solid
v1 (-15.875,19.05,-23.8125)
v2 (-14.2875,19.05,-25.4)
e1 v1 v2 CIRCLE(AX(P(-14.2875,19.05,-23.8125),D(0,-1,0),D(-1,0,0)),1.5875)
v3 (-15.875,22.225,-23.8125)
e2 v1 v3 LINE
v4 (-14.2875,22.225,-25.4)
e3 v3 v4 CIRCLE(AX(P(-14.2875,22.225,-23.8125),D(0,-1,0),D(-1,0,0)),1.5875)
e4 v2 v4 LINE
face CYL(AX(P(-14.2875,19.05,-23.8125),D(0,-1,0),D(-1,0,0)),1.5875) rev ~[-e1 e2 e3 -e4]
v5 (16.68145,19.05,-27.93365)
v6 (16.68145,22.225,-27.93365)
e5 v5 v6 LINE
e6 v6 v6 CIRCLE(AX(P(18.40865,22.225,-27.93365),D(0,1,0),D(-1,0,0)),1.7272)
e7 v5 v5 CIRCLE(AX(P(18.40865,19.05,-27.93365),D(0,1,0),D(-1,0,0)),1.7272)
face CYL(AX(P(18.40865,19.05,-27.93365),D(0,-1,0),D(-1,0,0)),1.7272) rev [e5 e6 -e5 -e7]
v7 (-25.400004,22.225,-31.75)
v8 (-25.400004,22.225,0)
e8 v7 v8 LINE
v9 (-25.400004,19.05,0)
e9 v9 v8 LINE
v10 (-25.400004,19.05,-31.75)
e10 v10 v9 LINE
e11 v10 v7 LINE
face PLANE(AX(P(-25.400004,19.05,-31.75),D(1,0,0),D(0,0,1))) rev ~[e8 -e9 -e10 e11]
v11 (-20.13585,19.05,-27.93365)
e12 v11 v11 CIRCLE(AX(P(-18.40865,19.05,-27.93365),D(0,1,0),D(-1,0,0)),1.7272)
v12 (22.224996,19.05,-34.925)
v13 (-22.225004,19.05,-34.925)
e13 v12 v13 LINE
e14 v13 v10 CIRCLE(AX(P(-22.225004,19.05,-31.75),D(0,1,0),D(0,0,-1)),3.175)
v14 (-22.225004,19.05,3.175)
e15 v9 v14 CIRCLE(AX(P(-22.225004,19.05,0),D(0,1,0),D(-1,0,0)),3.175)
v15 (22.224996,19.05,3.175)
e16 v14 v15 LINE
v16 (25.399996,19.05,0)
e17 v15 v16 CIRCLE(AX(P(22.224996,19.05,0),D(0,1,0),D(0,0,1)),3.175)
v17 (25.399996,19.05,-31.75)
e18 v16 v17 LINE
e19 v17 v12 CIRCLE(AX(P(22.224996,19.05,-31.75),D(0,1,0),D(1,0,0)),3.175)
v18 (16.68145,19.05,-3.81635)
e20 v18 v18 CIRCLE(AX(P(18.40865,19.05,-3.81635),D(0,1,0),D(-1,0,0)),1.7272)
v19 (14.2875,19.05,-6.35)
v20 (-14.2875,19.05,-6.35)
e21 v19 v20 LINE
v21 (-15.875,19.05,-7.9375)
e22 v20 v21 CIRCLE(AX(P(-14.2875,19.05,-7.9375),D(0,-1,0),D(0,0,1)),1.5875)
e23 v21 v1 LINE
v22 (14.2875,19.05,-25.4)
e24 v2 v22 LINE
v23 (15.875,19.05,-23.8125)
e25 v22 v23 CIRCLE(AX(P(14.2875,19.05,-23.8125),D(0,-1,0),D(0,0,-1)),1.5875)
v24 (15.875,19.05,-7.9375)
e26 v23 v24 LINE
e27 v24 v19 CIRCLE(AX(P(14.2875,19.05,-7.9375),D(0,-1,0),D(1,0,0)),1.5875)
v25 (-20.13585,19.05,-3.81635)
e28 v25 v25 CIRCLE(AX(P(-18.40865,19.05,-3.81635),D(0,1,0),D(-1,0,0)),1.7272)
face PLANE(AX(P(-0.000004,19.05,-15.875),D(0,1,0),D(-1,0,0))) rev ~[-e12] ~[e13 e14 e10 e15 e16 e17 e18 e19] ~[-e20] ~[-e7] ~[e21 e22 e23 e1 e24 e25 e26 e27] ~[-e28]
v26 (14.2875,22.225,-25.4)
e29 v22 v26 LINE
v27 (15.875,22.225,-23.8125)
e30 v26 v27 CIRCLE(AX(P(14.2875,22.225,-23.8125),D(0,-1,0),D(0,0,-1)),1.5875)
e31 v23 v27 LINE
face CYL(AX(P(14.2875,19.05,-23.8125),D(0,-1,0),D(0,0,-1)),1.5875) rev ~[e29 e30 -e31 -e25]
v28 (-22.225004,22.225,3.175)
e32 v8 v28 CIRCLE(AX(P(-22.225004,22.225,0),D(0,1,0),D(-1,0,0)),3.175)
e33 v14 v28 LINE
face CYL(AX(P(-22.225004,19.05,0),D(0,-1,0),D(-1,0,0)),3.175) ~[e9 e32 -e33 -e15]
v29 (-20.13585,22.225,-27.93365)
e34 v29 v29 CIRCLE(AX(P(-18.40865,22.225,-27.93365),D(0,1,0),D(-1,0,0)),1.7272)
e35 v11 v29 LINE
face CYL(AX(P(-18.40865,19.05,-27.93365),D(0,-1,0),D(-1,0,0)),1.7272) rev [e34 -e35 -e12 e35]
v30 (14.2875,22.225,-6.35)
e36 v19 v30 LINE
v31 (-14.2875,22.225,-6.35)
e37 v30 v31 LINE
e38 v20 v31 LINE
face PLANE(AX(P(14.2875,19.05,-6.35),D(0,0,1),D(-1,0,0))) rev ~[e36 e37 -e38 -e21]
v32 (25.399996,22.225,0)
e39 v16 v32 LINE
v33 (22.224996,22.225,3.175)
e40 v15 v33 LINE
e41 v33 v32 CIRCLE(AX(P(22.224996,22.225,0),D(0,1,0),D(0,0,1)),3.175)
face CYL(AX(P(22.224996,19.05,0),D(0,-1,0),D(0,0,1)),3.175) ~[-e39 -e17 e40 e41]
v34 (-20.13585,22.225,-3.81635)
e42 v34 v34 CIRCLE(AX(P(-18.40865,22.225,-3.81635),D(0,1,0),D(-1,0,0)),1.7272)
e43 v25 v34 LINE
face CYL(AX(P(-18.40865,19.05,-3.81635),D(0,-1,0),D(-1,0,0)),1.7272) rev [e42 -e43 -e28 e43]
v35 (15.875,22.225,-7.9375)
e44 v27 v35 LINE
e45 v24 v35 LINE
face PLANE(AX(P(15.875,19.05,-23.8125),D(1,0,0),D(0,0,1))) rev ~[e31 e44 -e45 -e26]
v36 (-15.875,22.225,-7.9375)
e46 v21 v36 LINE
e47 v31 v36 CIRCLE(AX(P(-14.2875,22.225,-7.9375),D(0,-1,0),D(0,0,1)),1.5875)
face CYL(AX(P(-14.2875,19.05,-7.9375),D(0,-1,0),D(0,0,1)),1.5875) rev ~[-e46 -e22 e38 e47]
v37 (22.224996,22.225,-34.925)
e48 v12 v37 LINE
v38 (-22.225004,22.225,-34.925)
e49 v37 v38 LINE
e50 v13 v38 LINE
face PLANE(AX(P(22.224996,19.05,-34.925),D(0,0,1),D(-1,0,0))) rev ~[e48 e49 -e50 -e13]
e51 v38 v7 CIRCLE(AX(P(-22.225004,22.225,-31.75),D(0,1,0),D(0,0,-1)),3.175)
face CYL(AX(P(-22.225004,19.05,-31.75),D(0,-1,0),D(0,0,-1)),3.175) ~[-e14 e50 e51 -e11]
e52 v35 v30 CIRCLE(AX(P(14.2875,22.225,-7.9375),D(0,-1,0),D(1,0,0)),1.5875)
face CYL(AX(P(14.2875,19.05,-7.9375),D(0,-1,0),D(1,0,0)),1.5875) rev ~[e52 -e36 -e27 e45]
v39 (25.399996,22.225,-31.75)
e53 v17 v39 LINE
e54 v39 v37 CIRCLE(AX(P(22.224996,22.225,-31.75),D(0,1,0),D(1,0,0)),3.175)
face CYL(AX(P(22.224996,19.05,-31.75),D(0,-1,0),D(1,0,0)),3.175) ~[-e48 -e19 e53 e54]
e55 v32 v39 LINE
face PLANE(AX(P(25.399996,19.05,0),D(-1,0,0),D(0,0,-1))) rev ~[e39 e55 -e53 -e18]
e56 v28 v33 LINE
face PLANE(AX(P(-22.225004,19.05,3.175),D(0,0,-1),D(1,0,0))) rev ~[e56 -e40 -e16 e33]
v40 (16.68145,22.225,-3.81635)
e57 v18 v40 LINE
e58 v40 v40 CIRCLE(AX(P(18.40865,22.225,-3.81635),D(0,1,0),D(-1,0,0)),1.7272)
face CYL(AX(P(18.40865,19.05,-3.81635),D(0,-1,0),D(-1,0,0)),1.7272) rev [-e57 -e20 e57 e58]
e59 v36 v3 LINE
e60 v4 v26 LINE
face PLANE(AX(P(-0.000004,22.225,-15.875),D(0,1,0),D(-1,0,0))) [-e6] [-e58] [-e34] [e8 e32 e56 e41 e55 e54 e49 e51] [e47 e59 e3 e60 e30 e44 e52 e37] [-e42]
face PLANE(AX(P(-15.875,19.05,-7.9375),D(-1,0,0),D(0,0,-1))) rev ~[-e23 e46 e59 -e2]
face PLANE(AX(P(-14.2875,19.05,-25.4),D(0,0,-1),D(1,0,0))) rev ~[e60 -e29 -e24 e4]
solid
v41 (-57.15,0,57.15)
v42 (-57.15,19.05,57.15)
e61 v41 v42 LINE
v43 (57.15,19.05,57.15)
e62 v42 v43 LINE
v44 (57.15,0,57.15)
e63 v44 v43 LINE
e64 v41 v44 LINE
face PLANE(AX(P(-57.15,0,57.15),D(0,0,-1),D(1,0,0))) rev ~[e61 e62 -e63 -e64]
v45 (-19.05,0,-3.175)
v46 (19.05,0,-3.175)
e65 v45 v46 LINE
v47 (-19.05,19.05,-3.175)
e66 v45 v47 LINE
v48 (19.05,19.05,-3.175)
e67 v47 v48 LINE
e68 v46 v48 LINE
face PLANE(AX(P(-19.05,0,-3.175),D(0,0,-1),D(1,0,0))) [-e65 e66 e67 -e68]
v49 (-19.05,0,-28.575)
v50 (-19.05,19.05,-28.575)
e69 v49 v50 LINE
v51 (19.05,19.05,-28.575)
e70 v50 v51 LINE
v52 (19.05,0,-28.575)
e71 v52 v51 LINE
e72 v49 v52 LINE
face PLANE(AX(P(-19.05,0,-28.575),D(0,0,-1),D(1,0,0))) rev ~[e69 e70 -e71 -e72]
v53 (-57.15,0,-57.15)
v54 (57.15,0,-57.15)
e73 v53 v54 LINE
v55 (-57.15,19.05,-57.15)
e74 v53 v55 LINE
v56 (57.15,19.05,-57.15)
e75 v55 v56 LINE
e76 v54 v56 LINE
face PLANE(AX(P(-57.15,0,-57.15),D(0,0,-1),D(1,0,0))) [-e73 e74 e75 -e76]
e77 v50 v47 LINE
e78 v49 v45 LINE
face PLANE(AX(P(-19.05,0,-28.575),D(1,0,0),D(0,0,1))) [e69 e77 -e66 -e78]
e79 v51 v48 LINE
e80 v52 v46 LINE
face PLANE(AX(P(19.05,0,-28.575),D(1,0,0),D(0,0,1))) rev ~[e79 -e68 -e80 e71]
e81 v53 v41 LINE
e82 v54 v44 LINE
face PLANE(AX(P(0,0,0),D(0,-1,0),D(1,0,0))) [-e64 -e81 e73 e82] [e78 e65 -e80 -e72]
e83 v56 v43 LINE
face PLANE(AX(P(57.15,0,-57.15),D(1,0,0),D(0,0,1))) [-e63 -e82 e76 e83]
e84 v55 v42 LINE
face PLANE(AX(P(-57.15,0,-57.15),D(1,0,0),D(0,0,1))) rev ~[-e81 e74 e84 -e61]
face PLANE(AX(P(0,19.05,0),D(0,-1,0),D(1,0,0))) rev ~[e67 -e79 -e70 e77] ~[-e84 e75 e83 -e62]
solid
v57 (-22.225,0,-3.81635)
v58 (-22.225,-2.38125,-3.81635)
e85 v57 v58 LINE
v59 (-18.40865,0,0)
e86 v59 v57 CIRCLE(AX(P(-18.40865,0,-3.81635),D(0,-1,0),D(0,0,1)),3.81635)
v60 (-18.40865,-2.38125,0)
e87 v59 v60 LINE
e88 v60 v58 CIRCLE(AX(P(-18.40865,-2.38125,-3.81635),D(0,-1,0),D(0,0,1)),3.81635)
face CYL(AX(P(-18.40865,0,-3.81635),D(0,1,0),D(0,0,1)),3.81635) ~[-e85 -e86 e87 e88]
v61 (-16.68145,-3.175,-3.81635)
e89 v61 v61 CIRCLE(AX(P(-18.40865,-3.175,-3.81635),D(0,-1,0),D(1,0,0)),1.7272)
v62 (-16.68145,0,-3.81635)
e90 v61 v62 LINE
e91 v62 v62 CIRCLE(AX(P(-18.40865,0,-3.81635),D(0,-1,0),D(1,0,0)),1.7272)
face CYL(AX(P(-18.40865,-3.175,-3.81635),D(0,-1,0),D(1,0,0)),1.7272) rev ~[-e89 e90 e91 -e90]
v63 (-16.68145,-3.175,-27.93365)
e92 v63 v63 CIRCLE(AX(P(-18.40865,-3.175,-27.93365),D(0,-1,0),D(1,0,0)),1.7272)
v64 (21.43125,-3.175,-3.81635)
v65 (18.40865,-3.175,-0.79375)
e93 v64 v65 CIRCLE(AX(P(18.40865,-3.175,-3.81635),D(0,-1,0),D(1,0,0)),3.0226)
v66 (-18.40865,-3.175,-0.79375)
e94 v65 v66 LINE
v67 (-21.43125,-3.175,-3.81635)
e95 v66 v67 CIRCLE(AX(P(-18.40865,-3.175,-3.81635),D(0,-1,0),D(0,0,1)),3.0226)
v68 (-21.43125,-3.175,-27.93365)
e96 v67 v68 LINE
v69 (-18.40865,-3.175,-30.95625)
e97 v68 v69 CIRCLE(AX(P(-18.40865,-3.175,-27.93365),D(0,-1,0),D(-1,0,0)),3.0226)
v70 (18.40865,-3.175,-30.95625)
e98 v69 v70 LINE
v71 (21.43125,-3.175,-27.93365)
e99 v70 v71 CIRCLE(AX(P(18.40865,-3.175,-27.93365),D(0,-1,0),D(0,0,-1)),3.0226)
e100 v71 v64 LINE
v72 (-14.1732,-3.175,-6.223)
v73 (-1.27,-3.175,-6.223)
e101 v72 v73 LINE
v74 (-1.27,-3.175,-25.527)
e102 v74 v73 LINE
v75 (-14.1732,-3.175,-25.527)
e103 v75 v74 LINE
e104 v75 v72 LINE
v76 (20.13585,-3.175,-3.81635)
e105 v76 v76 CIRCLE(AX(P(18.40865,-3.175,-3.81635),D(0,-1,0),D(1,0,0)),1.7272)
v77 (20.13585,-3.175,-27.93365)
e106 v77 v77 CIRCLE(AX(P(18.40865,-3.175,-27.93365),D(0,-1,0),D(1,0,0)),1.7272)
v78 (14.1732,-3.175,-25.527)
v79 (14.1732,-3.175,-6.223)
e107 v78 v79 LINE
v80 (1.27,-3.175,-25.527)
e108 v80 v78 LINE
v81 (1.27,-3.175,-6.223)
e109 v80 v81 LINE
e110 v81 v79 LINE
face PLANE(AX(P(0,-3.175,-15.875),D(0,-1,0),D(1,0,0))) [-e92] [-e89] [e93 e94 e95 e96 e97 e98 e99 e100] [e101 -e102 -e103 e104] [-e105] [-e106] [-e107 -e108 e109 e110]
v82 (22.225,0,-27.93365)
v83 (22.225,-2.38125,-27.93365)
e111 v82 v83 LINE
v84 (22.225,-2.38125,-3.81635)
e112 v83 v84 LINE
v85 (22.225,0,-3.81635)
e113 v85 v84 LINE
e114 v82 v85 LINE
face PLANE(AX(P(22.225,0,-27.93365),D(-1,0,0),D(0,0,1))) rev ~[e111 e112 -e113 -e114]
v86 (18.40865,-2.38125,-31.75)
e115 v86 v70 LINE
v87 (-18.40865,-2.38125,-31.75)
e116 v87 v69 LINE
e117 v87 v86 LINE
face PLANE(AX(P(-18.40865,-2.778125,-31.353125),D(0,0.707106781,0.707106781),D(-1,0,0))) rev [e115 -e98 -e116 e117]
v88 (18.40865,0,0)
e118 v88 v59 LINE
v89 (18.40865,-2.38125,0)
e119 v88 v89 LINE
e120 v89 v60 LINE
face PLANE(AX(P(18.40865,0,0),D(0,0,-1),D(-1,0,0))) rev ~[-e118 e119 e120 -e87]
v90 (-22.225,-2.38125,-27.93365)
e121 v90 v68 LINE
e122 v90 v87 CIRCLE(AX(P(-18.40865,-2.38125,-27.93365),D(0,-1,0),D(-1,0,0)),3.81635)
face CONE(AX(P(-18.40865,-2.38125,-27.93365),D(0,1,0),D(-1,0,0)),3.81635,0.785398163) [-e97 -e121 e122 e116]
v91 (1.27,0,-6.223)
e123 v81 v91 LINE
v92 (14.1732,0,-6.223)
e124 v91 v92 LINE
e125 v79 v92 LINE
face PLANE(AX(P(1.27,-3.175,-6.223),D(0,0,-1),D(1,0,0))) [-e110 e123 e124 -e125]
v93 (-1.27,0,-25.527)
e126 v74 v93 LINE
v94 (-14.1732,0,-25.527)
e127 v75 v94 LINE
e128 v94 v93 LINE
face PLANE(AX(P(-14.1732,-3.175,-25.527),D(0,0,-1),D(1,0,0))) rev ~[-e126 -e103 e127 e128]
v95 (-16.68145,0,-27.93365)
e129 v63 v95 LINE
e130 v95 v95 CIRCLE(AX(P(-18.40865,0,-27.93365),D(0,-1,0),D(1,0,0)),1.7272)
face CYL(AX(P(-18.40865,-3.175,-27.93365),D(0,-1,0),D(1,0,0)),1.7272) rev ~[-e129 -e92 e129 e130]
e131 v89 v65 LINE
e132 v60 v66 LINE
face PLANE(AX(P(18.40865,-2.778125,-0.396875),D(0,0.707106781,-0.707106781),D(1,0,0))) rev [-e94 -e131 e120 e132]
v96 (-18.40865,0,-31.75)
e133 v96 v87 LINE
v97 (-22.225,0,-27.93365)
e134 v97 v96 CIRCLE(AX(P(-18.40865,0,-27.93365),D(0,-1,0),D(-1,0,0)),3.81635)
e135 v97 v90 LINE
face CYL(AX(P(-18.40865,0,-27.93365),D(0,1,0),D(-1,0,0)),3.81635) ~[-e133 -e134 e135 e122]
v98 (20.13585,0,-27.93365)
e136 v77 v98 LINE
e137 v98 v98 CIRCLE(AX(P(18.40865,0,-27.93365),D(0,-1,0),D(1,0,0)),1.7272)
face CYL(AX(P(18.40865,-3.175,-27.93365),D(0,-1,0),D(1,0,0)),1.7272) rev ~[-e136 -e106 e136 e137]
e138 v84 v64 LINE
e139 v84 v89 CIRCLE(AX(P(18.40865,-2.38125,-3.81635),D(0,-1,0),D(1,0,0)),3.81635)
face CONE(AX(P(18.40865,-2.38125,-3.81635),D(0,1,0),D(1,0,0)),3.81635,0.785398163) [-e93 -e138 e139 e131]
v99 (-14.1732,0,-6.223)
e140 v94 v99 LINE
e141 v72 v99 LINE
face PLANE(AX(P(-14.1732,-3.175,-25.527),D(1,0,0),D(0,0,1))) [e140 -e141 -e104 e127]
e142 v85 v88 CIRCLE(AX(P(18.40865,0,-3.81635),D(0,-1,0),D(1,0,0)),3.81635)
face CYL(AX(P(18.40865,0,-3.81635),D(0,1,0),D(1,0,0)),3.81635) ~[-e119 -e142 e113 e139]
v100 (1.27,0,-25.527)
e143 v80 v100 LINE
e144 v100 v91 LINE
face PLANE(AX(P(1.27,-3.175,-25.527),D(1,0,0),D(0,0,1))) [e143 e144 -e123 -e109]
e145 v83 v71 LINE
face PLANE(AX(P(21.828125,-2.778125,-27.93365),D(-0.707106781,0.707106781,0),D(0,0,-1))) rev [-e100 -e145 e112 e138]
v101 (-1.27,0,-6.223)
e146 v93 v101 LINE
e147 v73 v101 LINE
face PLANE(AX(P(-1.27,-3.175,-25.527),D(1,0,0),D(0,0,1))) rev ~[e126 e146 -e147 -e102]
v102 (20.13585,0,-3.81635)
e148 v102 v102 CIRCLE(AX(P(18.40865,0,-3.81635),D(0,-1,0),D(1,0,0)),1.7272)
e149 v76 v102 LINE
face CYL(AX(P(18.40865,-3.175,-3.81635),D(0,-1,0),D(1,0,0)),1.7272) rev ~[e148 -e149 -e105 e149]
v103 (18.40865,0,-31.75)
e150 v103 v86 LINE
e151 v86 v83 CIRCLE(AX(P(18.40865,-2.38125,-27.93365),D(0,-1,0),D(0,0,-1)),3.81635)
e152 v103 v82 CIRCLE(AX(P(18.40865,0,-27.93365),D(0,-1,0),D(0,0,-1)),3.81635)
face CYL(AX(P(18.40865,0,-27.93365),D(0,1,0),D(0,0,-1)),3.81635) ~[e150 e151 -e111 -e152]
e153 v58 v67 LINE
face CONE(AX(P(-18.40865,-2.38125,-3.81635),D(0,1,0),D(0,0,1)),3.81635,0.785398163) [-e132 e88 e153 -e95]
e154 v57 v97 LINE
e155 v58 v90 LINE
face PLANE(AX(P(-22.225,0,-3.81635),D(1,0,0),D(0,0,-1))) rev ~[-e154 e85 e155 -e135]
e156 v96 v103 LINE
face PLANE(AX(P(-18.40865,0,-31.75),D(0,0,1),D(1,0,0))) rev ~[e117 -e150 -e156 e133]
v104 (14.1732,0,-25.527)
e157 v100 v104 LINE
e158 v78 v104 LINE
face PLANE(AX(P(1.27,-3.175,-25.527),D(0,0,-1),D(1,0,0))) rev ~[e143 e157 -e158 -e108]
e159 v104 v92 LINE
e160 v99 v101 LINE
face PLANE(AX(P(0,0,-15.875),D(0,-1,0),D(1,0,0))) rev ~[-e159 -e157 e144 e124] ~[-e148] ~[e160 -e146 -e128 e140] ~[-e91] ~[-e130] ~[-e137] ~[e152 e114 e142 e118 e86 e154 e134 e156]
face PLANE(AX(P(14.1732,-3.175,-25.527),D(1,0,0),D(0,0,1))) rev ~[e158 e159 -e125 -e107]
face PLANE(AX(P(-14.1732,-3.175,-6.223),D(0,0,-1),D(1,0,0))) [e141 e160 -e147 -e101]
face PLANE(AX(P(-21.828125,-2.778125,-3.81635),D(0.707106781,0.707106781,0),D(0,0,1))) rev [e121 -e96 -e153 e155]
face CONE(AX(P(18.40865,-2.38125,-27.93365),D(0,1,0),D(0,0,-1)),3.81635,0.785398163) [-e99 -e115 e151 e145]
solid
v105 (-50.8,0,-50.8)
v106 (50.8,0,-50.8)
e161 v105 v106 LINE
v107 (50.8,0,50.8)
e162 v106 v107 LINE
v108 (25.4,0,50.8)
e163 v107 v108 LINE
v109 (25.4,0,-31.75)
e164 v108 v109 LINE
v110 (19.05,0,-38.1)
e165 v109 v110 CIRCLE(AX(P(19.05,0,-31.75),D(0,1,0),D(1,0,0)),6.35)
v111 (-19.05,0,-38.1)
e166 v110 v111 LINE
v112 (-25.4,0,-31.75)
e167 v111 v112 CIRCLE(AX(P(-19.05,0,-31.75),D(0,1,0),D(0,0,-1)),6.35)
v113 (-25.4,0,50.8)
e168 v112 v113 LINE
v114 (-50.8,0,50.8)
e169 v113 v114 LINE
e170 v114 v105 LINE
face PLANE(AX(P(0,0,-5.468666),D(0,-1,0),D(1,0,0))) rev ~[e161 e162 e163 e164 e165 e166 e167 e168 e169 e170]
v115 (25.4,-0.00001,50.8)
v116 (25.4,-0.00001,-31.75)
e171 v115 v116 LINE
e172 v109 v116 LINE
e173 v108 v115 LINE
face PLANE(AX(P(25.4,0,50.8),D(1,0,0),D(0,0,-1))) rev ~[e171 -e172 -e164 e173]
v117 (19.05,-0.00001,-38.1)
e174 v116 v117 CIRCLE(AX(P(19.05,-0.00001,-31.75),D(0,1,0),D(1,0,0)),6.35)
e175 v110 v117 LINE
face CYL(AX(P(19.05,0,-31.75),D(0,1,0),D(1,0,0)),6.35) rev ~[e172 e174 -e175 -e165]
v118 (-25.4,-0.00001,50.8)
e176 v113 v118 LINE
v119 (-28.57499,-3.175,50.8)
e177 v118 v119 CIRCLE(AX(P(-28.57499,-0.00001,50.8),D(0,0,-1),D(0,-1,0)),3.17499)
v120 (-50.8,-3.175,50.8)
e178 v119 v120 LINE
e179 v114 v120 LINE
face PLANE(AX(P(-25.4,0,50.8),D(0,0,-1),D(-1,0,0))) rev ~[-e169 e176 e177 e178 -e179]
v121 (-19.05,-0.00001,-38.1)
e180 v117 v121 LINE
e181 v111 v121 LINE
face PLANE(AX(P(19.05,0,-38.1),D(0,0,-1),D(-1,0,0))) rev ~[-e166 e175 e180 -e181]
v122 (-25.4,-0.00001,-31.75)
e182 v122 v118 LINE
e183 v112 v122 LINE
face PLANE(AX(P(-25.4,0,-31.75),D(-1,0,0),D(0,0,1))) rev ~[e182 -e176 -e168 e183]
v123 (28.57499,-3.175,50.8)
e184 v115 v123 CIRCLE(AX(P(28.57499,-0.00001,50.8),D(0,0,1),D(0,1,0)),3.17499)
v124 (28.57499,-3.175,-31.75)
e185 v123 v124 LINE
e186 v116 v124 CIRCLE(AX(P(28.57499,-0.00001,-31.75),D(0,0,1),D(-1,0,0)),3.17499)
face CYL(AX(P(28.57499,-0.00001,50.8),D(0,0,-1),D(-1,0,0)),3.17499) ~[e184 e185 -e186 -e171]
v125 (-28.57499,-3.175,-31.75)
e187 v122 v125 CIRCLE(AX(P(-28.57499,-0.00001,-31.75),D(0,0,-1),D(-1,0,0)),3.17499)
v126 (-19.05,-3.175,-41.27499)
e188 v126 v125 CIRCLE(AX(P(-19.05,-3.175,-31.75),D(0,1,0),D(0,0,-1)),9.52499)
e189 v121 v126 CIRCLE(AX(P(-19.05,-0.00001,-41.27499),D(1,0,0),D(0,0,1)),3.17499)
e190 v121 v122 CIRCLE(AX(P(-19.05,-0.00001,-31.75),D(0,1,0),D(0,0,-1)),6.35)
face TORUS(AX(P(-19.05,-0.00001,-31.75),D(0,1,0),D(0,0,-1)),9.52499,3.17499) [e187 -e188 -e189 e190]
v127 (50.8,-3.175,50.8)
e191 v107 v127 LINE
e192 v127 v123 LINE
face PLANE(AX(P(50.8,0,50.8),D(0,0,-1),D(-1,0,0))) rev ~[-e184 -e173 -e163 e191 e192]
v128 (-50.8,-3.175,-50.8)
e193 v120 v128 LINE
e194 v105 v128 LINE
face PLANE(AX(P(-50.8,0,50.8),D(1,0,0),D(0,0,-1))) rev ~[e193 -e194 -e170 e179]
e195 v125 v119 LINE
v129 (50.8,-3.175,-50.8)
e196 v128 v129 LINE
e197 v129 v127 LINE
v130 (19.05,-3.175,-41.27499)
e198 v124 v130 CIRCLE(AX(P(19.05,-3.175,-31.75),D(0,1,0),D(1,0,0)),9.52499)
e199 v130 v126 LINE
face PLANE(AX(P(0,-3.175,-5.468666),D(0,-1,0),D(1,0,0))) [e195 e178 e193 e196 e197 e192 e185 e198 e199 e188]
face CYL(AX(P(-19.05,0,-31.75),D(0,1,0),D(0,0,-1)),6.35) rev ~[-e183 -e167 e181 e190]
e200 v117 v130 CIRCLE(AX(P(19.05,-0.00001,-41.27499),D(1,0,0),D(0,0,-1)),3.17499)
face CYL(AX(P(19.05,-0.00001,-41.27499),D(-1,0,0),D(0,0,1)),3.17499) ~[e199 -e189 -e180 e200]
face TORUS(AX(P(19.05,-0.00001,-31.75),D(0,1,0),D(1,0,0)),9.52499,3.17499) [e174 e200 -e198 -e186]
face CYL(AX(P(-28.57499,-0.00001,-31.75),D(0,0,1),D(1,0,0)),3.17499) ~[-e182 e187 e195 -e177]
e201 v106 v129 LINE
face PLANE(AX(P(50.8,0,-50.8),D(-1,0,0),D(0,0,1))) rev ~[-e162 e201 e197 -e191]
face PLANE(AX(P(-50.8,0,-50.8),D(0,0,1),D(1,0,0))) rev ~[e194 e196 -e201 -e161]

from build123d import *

# Parameters (mm, degrees)
F0_W      = 114.3
F0_H      = 114.3
F1_DEPTH  = 19.05
F3_DEPTH  = 3.175
F4_R      = 3.17499
F5_W      = 38.1
F5_H      = 25.4
F6_DEPTH  = 19.051
F8_DEPTH  = 3.175
F9_SIZE   = 0.79375
F10_W     = 12.9032
F10_H     = 19.304
F11_DEPTH = 22.226
F12_R     = 1.7272
F13_DEPTH = 22.226
F14_R     = 1.7272
F15_DEPTH = 3.175


# Not quite as in the source:
# - a fillet or chamfer is up to 0.001 mm smaller than in the source, because OpenCascade refuses the exact size


with BuildPart() as f1:
    # F0 (on Front) → F1 (new body)
    with BuildSketch(Plane.XZ):
        Rectangle(F0_W, F0_H)
    extrude(amount=-F1_DEPTH)

    # F5 (on Front) → F6 (cut, through all)
    with BuildSketch(Plane.XZ):
        with Locations((0, -15.875)):
            Rectangle(F5_W, F5_H)
    extrude(amount=-F6_DEPTH, mode=Mode.SUBTRACT)


with BuildPart() as f3:
    # F2 (on Front) → F3 (new body)
    with BuildSketch(Plane.XZ):
        with BuildLine():
            Line((-50.8, 50.8), (-50.8, -50.8))
            Line((-50.8, -50.8), (50.8, -50.8))
            Line((50.8, -50.8), (50.8, 50.8))
            Line((50.8, 50.8), (25.4, 50.8))
            Line((25.4, 50.8), (25.4, -31.75))
            ThreePointArc((25.4, -31.75), (23.5401280605, -36.2401280605), (19.05, -38.1))
            Line((19.05, -38.1), (-19.05, -38.1))
            ThreePointArc((-19.05, -38.1), (-23.5401280605, -36.2401280605), (-25.4, -31.75))
            Line((-25.4, -31.75), (-25.4, 50.8))
            Line((-25.4, 50.8), (-50.8, 50.8))
        make_face()
    extrude(amount=F3_DEPTH)

    # F4 (radius 3.175 in the source; OpenCascade refuses exactly that, so slightly less here)
    f4_edges = [f3.edges().sort_by_distance(p)[0] for p in [
        (-25.4, -3.175, 9.525),
        (25.4, -3.175, 9.525),
        (23.540128, -3.175, -36.240128),
        (0, -3.175, -38.1),
        (-23.540128, -3.175, -36.240128),
    ]]
    fillet(f4_edges, radius=F4_R)


with BuildPart() as f8:
    # F7 (on Front) → F8 (new body)
    with BuildSketch(Plane.XZ):
        with BuildLine():
            Line((18.40865, 0), (-18.40865, 0))
            ThreePointArc((-18.40865, 0), (-21.1072169644, -1.1177830356), (-22.225, -3.81635))
            Line((-22.225, -3.81635), (-22.225, -27.93365))
            ThreePointArc((-22.225, -27.93365), (-21.1072169644, -30.6322169644), (-18.40865, -31.75))
            Line((-18.40865, -31.75), (18.40865, -31.75))
            ThreePointArc((18.40865, -31.75), (21.1072169644, -30.6322169644), (22.225, -27.93365))
            Line((22.225, -27.93365), (22.225, -3.81635))
            ThreePointArc((22.225, -3.81635), (21.1072169644, -1.1177830356), (18.40865, 0))
        make_face()
    extrude(amount=F8_DEPTH)

    # F9
    f9_edges = [f8.edges().sort_by_distance(p)[0] for p in [
        (0, -3.175, 0),
        (-21.107217, -3.175, -1.117783),
        (-22.225, -3.175, -15.875),
        (-21.107217, -3.175, -30.632217),
        (0, -3.175, -31.75),
        (21.107217, -3.175, -30.632217),
        (22.225, -3.175, -15.875),
        (21.107217, -3.175, -1.117783),
    ]]
    chamfer(f9_edges, length=F9_SIZE)

    # F10 (on face) → F11 (cut, through all)
    with BuildSketch(Plane.XZ.offset(3.175)):
        with Locations((-7.7216, -15.875)):
            Rectangle(F10_W, F10_H)
        with Locations((7.7216, -15.875)):
            Rectangle(F10_W, F10_H)
    extrude(amount=-F11_DEPTH, mode=Mode.SUBTRACT)

    # F12 (on face) → F13 (cut, through all)
    with BuildSketch(Plane.XZ.offset(3.175)):
        with Locations((-18.40865, -3.81635)):
            Circle(F12_R)
        with Locations((-18.40865, -27.93365)):
            Circle(F12_R)
        with Locations((18.40865, -3.81635)):
            Circle(F12_R)
        with Locations((18.40865, -27.93365)):
            Circle(F12_R)
    extrude(amount=-F13_DEPTH, mode=Mode.SUBTRACT)


with BuildPart() as f15:
    # F14 (on face) → F15 (new body)
    with BuildSketch(Plane(origin=(0, 19.05, 0), x_dir=(-1, 0, 0), z_dir=(0, 1, 0))):
        with BuildLine():
            Line((22.2250037253, 3.175), (-22.2249962747, 3.175))
            ThreePointArc((-22.2249962747, 3.175), (-24.470060305, 2.2450640303), (-25.3999962747, 0))
            Line((-25.3999962747, 0), (-25.3999962747, -31.75))
            ThreePointArc((-25.3999962747, -31.75), (-24.470060305, -33.9950640303), (-22.2249962747, -34.925))
            Line((-22.2249962747, -34.925), (22.2250037253, -34.925))
            ThreePointArc((22.2250037253, -34.925), (24.4700677556, -33.9950640303), (25.4000037253, -31.75))
            Line((25.4000037253, -31.75), (25.4000037253, 0))
            ThreePointArc((25.4000037253, 0), (24.4700677556, 2.2450640303), (22.2250037253, 3.175))
        make_face()
        with Locations((-18.40865, -27.93365)):
            Circle(F14_R, mode=Mode.SUBTRACT)
        with Locations((18.40865, -27.93365)):
            Circle(F14_R, mode=Mode.SUBTRACT)
        with BuildLine():
            ThreePointArc((-15.875, -7.9375), (-15.4100320151, -6.8149679849), (-14.2875, -6.35))
            Line((-14.2875, -6.35), (14.2875, -6.35))
            ThreePointArc((14.2875, -6.35), (15.4100320151, -6.8149679849), (15.875, -7.9375))
            Line((15.875, -7.9375), (15.875, -23.8125))
            ThreePointArc((15.875, -23.8125), (15.4100320151, -24.9350320151), (14.2875, -25.4))
            Line((14.2875, -25.4), (-14.2875, -25.4))
            ThreePointArc((-14.2875, -25.4), (-15.4100320151, -24.9350320151), (-15.875, -23.8125))
            Line((-15.875, -23.8125), (-15.875, -7.9375))
        make_face(mode=Mode.SUBTRACT)
        with Locations((-18.40865, -3.81635)):
            Circle(F14_R, mode=Mode.SUBTRACT)
        with Locations((18.40865, -3.81635)):
            Circle(F14_R, mode=Mode.SUBTRACT)
    extrude(amount=F15_DEPTH)


solid = Compound([f1.part, f3.part, f8.part, f15.part])
